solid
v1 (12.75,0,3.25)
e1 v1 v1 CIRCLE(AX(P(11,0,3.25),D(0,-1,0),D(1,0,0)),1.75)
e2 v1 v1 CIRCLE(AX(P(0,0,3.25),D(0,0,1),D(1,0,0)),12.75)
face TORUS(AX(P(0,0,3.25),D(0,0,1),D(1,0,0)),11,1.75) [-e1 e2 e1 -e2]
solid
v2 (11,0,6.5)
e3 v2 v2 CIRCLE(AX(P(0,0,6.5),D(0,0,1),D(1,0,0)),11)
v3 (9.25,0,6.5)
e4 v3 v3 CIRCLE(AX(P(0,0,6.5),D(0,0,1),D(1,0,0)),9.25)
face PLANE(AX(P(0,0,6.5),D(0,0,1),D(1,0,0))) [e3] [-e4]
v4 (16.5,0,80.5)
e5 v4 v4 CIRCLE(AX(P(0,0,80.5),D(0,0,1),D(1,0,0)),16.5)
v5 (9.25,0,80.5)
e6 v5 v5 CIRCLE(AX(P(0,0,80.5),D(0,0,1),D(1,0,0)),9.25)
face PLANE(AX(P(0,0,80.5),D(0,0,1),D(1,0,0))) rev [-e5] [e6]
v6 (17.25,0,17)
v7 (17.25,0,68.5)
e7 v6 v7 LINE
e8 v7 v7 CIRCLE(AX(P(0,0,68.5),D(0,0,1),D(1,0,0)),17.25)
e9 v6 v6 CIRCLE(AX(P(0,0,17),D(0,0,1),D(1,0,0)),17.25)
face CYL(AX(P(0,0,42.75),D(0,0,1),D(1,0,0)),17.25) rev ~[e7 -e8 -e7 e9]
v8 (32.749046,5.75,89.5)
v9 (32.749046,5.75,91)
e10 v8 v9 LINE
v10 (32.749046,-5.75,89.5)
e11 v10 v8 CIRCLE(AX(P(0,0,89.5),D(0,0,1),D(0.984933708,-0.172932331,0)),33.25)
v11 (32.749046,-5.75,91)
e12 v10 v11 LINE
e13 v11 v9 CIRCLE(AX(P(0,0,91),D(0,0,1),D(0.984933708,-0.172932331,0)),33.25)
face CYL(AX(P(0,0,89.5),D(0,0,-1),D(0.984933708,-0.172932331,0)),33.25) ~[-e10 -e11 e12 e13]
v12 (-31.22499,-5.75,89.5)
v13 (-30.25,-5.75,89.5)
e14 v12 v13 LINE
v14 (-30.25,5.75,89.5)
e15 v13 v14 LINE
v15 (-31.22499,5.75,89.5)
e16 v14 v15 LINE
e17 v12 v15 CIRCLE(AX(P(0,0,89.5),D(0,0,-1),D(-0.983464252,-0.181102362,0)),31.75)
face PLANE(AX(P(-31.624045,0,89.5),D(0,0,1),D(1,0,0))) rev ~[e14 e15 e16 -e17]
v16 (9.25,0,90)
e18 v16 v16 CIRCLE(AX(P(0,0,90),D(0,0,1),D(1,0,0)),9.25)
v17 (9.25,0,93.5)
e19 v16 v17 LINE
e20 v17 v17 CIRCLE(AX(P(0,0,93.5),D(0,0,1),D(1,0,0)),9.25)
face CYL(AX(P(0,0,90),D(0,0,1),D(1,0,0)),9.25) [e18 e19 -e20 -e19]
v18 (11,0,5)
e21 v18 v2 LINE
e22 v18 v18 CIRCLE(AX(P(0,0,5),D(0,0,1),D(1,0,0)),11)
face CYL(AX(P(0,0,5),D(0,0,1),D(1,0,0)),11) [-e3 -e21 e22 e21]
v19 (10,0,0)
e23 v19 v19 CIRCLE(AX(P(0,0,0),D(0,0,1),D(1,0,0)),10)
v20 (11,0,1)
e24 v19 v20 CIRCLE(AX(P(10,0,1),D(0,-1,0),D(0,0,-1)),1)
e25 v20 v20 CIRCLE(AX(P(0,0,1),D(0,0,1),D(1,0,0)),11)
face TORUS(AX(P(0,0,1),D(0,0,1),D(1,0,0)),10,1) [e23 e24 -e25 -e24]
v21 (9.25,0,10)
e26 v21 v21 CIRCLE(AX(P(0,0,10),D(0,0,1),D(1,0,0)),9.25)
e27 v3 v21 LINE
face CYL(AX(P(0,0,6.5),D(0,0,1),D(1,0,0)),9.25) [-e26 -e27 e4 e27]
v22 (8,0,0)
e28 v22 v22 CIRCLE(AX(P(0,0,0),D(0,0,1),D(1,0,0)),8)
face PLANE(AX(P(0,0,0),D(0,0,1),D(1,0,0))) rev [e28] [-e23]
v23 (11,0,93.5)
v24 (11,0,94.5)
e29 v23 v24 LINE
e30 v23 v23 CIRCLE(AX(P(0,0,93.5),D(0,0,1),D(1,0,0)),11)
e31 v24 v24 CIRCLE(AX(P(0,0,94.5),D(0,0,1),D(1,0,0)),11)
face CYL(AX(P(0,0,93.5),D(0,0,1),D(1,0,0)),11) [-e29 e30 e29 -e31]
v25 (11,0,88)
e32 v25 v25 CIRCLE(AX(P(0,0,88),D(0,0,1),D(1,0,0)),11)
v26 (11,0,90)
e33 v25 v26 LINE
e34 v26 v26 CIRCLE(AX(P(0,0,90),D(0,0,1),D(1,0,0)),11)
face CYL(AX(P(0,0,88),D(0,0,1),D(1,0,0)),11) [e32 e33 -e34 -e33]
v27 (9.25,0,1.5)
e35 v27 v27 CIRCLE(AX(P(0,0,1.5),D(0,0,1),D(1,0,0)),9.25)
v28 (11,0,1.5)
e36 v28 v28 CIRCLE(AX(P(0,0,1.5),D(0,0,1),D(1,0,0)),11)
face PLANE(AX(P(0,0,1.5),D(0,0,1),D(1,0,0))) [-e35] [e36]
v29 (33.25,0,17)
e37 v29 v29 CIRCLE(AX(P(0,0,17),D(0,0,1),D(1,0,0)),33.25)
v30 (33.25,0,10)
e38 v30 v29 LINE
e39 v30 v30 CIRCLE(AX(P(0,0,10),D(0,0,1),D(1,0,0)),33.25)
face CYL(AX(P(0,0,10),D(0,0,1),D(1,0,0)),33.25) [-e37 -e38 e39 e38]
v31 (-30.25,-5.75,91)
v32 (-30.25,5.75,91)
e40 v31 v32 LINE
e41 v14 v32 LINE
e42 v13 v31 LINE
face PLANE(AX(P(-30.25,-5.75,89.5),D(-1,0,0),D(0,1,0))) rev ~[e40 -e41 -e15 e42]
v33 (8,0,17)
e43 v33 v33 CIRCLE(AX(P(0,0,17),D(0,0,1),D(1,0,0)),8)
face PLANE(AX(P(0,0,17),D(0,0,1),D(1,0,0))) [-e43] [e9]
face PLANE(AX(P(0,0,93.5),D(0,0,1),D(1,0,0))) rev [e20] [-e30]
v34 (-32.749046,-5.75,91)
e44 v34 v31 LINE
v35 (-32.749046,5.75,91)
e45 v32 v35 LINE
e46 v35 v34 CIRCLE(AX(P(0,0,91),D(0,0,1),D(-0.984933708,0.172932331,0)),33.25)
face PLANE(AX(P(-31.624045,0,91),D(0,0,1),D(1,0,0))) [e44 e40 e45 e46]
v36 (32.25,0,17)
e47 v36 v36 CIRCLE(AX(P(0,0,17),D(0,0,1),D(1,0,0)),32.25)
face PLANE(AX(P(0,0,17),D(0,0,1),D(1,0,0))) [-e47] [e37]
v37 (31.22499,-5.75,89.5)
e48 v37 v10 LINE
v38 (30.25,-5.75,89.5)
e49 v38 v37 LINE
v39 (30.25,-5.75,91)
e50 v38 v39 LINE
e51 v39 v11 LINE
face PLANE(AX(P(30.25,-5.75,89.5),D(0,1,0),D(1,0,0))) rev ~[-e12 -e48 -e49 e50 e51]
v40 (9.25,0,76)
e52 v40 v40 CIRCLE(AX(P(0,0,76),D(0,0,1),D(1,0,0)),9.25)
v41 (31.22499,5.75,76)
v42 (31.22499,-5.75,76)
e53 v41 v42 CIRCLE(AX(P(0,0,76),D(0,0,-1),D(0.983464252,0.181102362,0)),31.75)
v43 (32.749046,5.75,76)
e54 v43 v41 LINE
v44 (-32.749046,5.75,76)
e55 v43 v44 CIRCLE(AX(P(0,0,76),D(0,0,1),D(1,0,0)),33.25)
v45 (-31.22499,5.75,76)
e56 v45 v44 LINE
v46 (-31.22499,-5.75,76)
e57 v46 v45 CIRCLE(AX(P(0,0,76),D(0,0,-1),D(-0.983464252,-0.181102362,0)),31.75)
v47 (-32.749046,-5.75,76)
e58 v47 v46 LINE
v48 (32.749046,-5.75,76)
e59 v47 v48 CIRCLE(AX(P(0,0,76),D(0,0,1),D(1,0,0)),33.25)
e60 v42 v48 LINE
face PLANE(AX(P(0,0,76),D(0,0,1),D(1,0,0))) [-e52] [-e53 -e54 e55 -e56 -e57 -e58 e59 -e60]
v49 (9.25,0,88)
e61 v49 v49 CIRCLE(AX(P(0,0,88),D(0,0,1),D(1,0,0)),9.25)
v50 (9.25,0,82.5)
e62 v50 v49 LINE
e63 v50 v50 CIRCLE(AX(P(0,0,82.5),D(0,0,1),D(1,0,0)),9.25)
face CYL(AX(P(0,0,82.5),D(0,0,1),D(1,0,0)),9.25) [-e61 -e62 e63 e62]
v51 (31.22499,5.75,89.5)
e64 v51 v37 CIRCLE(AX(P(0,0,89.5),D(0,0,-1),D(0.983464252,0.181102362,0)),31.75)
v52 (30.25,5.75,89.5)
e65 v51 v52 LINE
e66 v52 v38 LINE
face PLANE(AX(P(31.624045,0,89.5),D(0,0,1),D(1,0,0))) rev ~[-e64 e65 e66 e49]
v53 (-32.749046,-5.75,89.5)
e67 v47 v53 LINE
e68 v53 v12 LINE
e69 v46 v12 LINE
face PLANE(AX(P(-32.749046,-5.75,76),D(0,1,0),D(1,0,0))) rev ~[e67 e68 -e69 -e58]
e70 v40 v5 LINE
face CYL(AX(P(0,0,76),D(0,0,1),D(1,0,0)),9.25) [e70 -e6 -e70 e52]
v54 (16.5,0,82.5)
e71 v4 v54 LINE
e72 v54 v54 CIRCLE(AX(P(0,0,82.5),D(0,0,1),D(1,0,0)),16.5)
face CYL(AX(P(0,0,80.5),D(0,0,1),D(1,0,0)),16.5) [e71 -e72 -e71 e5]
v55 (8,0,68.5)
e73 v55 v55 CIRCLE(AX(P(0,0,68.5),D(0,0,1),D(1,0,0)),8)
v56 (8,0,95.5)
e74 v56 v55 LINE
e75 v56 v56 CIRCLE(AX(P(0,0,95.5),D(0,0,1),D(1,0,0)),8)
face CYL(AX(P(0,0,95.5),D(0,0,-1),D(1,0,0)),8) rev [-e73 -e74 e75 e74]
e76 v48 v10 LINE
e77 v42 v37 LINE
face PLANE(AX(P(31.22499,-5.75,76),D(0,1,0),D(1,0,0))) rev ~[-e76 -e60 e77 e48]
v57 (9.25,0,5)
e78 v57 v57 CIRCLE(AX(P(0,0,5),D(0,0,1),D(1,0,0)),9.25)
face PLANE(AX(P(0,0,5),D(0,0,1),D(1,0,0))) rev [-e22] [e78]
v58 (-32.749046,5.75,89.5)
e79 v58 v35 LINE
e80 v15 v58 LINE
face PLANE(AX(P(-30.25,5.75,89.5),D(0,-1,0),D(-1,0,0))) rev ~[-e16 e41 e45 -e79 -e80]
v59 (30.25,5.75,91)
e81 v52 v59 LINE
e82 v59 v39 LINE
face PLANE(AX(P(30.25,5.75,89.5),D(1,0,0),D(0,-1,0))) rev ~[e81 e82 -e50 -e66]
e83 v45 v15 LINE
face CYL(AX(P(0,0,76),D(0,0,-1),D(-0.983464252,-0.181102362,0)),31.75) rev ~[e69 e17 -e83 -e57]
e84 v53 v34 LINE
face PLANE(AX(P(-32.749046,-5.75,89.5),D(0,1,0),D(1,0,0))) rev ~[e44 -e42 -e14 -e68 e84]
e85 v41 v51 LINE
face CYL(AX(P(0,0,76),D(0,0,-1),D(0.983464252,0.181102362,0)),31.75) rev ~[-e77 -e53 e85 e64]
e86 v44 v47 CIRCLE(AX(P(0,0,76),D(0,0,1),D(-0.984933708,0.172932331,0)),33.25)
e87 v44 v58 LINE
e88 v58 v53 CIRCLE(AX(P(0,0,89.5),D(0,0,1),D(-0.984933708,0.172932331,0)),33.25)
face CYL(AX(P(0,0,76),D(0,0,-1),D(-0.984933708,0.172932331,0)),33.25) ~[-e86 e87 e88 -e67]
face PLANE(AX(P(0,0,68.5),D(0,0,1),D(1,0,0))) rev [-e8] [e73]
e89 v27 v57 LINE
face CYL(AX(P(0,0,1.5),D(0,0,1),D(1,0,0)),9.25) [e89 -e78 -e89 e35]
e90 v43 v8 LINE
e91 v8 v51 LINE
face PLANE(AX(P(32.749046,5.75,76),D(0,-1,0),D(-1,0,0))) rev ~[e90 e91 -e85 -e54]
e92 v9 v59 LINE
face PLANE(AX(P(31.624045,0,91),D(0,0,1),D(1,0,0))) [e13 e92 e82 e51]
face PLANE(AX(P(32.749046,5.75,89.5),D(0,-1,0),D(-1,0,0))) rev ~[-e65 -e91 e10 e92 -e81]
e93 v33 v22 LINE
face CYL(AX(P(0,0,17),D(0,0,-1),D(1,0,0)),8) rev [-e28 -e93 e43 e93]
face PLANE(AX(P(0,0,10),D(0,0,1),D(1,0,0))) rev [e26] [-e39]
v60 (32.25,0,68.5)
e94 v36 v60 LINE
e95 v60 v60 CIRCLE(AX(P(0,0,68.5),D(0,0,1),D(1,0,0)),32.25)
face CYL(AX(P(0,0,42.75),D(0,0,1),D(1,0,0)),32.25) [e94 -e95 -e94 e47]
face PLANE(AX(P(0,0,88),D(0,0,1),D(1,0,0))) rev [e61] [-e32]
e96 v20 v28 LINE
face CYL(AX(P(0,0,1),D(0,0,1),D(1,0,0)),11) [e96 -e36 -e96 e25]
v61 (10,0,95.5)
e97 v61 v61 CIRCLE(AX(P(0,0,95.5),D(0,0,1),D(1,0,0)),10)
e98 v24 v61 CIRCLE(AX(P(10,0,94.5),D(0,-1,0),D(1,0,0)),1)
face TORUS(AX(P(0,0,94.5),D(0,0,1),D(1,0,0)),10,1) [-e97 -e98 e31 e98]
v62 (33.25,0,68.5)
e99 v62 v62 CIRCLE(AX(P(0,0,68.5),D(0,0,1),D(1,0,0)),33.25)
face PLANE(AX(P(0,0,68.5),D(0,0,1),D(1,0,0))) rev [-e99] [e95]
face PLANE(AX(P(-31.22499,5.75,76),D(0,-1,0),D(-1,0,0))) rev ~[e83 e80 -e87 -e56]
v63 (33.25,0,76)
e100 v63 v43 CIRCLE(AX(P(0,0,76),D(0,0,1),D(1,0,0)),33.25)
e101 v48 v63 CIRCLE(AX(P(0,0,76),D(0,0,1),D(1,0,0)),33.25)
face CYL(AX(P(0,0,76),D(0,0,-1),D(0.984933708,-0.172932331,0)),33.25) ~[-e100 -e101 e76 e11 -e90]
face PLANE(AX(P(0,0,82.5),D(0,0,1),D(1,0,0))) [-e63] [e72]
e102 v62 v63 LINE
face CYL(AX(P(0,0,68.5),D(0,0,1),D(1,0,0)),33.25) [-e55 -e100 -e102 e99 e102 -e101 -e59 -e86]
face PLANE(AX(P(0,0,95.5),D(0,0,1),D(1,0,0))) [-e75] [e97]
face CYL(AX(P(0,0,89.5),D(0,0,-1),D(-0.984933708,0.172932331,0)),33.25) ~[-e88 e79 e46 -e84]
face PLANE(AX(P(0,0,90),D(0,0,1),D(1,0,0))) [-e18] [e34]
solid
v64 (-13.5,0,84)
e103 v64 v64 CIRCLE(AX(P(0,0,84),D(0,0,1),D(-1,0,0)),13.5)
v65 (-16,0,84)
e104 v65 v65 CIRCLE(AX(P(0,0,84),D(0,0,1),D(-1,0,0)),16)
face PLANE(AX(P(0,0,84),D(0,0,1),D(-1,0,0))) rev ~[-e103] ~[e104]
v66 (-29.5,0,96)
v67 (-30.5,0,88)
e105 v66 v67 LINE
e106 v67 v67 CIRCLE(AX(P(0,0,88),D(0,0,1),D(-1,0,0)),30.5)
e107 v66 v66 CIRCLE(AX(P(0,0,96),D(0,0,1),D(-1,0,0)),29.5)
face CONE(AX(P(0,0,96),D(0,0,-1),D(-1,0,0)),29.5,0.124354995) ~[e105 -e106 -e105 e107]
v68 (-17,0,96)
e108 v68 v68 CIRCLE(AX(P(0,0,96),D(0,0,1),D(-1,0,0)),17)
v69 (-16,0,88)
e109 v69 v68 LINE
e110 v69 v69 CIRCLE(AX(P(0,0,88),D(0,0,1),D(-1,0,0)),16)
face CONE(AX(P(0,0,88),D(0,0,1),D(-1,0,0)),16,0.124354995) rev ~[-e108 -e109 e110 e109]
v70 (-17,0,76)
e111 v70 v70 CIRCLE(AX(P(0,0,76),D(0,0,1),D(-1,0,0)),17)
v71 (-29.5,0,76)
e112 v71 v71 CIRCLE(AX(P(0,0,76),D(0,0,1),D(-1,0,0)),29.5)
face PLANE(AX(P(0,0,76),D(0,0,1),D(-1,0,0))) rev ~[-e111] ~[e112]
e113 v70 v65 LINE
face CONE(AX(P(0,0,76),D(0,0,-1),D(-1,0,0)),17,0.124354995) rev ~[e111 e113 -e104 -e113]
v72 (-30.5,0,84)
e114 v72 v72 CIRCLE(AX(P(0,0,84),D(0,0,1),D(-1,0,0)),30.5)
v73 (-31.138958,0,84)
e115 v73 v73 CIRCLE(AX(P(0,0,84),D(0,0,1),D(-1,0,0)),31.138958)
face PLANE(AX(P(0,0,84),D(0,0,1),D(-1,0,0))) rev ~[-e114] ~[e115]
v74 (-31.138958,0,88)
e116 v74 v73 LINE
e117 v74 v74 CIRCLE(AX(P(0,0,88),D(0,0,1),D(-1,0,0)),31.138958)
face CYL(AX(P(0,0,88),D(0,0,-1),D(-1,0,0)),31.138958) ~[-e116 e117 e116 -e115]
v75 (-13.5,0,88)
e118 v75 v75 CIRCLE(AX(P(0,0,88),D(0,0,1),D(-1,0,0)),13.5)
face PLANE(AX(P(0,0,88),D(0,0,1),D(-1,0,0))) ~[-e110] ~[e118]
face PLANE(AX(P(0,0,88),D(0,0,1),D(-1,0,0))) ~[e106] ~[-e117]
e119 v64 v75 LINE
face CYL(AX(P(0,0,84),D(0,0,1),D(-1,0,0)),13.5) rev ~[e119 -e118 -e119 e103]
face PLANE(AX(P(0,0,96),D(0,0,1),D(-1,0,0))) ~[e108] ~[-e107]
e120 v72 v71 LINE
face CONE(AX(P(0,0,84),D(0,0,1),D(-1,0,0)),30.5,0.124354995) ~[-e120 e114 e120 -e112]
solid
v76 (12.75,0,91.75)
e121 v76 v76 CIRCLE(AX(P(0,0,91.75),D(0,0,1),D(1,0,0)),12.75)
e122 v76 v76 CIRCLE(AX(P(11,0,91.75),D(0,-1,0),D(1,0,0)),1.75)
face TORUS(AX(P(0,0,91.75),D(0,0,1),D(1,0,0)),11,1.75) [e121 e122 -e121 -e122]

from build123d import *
from build123d import SkipClean  # not in build123d's __all__

# Parameters (mm, degrees)
F0_W     = 15
F0_H     = 51.5
F2_R     = 1.75
F5_DEPTH = 13.5
F7_DEPTH = 1.5


# Not quite as in the source:
# - after a boolean that leaves OpenCascade's solid faulty, fix() repairs it


with BuildPart() as f1:
    # F0 (on Front) → F1 (revolve)
    with BuildSketch(Plane.XZ):
        with BuildLine():
            Line((8, 17), (8, 0))
            Line((8, 0), (10, 0))
            ThreePointArc((10, 0), (10.7071067812, 0.2928932188), (11, 1))
            Line((11, 1), (11, 1.5))
            Line((11, 1.5), (9.25, 1.5))
            Line((9.25, 1.5), (9.25, 5))
            Line((9.25, 5), (11, 5))
            Line((11, 5), (11, 6.5))
            Line((11, 6.5), (9.25, 6.5))
            Line((9.25, 6.5), (9.25, 10))
            Line((9.25, 10), (33.25, 10))
            Line((33.25, 10), (33.25, 17))
            Line((33.25, 17), (32.25, 17))
            Line((32.25, 17), (17.25, 17))
            Line((17.25, 17), (8, 17))
        make_face()
        with Locations((24.75, 42.75)):
            Rectangle(F0_W, F0_H)
        with BuildLine():
            Line((8, 68.5), (17.25, 68.5))
            Line((17.25, 68.5), (32.25, 68.5))
            Line((32.25, 68.5), (33.25, 68.5))
            Line((33.25, 68.5), (33.25, 76))
            Line((33.25, 76), (16.5, 76))
            Line((16.5, 76), (9.25, 76))
            Line((9.25, 76), (9.25, 80.5))
            Line((9.25, 80.5), (16.5, 80.5))
            Line((16.5, 80.5), (16.5, 82.5))
            Line((16.5, 82.5), (13.127643615, 82.5))
            Line((13.127643615, 82.5), (9.25, 82.5))
            Line((9.25, 82.5), (9.25, 88))
            Line((9.25, 88), (11, 88))
            Line((11, 88), (11, 90))
            Line((11, 90), (9.25, 90))
            Line((9.25, 90), (9.25, 93.5))
            Line((9.25, 93.5), (11, 93.5))
            Line((11, 93.5), (11, 94.5))
            ThreePointArc((11, 94.5), (10.7071067812, 95.2071067812), (10, 95.5))
            Line((10, 95.5), (8, 95.5))
            Line((8, 95.5), (8, 68.5))
        make_face()
    revolve(axis=Axis((0, 0, 8.8243792458), (0, 0, 1)))

    # F4 (on face) → F5 (join)
    with BuildSketch(Plane.XY.offset(76)):
        with BuildLine():
            Line((31.224989992, -5.75), (32.7490457876, -5.75))
            ThreePointArc((32.7490457876, -5.75), (33.25, 0), (32.7490457876, 5.75))
            Line((32.7490457876, 5.75), (31.224989992, 5.75))
            ThreePointArc((31.224989992, 5.75), (31.75, 0), (31.224989992, -5.75))
        make_face()
        with BuildLine():
            Line((-31.224989992, 5.75), (-32.7490457876, 5.75))
            ThreePointArc((-32.7490457876, 5.75), (-33.25, 0), (-32.7490457876, -5.75))
            Line((-32.7490457876, -5.75), (-31.224989992, -5.75))
            ThreePointArc((-31.224989992, -5.75), (-31.75, 0), (-31.224989992, 5.75))
        make_face()
    with SkipClean():  # cleaning this boolean's faces spoils the solid; the shape is the same uncleaned
        extrude(amount=F5_DEPTH)

    # F6 (on face) → F7 (join)
    with BuildSketch(Plane.XY.offset(89.5)):
        with BuildLine():
            ThreePointArc((32.7490457876, -5.75), (33.25, 0), (32.7490457876, 5.75))
            Line((32.7490457876, 5.75), (30.25, 5.75))
            Line((30.25, 5.75), (30.25, -5.75))
            Line((30.25, -5.75), (32.7490457876, -5.75))
        make_face()
        with BuildLine():
            ThreePointArc((-32.7490457876, 5.75), (-33.25, 0), (-32.7490457876, -5.75))
            Line((-32.7490457876, -5.75), (-30.25, -5.75))
            Line((-30.25, -5.75), (-30.25, 5.75))
            Line((-30.25, 5.75), (-32.7490457876, 5.75))
        make_face()
    extrude(amount=F7_DEPTH)

    add(f1.part.fix(), mode=Mode.REPLACE)


with BuildPart() as f3:
    # F2 (on Front) → F3 (revolve)
    with BuildSketch(Plane.XZ):
        with Locations((11, 91.75)):
            Circle(F2_R)
    revolve(axis=Axis((0, 0, 8.8243792458), (0, 0, 1)))


with BuildPart() as f3b:
    # F2 (on Front) → F3, piece 2 (revolve)
    with BuildSketch(Plane.XZ):
        with Locations((11, 3.25)):
            Circle(F2_R)
    revolve(axis=Axis((0, 0, 8.8243792458), (0, 0, 1)))


with BuildPart() as f9:
    # F8 (on Front) → F9 (revolve)
    with BuildSketch(Plane.XZ):
        Polygon((-30.5, 84), (-29.5, 76), (-17, 76), (-16, 84), (-13.5, 84), (-13.5, 86), (-31.1389584094, 86), (-31.1389584094, 84), align=None)
        Polygon((-31.1389584094, 88), (-31.1389584094, 86), (-13.5, 86), (-13.5, 88), (-16, 88), (-17, 96), (-29.5, 96), (-30.5, 88), align=None)
    revolve(axis=Axis((0, 0, 47.1165850759), (0, 0, 1)))


solid = Compound([f1.part, f3.part, f3b.part, f9.part])
